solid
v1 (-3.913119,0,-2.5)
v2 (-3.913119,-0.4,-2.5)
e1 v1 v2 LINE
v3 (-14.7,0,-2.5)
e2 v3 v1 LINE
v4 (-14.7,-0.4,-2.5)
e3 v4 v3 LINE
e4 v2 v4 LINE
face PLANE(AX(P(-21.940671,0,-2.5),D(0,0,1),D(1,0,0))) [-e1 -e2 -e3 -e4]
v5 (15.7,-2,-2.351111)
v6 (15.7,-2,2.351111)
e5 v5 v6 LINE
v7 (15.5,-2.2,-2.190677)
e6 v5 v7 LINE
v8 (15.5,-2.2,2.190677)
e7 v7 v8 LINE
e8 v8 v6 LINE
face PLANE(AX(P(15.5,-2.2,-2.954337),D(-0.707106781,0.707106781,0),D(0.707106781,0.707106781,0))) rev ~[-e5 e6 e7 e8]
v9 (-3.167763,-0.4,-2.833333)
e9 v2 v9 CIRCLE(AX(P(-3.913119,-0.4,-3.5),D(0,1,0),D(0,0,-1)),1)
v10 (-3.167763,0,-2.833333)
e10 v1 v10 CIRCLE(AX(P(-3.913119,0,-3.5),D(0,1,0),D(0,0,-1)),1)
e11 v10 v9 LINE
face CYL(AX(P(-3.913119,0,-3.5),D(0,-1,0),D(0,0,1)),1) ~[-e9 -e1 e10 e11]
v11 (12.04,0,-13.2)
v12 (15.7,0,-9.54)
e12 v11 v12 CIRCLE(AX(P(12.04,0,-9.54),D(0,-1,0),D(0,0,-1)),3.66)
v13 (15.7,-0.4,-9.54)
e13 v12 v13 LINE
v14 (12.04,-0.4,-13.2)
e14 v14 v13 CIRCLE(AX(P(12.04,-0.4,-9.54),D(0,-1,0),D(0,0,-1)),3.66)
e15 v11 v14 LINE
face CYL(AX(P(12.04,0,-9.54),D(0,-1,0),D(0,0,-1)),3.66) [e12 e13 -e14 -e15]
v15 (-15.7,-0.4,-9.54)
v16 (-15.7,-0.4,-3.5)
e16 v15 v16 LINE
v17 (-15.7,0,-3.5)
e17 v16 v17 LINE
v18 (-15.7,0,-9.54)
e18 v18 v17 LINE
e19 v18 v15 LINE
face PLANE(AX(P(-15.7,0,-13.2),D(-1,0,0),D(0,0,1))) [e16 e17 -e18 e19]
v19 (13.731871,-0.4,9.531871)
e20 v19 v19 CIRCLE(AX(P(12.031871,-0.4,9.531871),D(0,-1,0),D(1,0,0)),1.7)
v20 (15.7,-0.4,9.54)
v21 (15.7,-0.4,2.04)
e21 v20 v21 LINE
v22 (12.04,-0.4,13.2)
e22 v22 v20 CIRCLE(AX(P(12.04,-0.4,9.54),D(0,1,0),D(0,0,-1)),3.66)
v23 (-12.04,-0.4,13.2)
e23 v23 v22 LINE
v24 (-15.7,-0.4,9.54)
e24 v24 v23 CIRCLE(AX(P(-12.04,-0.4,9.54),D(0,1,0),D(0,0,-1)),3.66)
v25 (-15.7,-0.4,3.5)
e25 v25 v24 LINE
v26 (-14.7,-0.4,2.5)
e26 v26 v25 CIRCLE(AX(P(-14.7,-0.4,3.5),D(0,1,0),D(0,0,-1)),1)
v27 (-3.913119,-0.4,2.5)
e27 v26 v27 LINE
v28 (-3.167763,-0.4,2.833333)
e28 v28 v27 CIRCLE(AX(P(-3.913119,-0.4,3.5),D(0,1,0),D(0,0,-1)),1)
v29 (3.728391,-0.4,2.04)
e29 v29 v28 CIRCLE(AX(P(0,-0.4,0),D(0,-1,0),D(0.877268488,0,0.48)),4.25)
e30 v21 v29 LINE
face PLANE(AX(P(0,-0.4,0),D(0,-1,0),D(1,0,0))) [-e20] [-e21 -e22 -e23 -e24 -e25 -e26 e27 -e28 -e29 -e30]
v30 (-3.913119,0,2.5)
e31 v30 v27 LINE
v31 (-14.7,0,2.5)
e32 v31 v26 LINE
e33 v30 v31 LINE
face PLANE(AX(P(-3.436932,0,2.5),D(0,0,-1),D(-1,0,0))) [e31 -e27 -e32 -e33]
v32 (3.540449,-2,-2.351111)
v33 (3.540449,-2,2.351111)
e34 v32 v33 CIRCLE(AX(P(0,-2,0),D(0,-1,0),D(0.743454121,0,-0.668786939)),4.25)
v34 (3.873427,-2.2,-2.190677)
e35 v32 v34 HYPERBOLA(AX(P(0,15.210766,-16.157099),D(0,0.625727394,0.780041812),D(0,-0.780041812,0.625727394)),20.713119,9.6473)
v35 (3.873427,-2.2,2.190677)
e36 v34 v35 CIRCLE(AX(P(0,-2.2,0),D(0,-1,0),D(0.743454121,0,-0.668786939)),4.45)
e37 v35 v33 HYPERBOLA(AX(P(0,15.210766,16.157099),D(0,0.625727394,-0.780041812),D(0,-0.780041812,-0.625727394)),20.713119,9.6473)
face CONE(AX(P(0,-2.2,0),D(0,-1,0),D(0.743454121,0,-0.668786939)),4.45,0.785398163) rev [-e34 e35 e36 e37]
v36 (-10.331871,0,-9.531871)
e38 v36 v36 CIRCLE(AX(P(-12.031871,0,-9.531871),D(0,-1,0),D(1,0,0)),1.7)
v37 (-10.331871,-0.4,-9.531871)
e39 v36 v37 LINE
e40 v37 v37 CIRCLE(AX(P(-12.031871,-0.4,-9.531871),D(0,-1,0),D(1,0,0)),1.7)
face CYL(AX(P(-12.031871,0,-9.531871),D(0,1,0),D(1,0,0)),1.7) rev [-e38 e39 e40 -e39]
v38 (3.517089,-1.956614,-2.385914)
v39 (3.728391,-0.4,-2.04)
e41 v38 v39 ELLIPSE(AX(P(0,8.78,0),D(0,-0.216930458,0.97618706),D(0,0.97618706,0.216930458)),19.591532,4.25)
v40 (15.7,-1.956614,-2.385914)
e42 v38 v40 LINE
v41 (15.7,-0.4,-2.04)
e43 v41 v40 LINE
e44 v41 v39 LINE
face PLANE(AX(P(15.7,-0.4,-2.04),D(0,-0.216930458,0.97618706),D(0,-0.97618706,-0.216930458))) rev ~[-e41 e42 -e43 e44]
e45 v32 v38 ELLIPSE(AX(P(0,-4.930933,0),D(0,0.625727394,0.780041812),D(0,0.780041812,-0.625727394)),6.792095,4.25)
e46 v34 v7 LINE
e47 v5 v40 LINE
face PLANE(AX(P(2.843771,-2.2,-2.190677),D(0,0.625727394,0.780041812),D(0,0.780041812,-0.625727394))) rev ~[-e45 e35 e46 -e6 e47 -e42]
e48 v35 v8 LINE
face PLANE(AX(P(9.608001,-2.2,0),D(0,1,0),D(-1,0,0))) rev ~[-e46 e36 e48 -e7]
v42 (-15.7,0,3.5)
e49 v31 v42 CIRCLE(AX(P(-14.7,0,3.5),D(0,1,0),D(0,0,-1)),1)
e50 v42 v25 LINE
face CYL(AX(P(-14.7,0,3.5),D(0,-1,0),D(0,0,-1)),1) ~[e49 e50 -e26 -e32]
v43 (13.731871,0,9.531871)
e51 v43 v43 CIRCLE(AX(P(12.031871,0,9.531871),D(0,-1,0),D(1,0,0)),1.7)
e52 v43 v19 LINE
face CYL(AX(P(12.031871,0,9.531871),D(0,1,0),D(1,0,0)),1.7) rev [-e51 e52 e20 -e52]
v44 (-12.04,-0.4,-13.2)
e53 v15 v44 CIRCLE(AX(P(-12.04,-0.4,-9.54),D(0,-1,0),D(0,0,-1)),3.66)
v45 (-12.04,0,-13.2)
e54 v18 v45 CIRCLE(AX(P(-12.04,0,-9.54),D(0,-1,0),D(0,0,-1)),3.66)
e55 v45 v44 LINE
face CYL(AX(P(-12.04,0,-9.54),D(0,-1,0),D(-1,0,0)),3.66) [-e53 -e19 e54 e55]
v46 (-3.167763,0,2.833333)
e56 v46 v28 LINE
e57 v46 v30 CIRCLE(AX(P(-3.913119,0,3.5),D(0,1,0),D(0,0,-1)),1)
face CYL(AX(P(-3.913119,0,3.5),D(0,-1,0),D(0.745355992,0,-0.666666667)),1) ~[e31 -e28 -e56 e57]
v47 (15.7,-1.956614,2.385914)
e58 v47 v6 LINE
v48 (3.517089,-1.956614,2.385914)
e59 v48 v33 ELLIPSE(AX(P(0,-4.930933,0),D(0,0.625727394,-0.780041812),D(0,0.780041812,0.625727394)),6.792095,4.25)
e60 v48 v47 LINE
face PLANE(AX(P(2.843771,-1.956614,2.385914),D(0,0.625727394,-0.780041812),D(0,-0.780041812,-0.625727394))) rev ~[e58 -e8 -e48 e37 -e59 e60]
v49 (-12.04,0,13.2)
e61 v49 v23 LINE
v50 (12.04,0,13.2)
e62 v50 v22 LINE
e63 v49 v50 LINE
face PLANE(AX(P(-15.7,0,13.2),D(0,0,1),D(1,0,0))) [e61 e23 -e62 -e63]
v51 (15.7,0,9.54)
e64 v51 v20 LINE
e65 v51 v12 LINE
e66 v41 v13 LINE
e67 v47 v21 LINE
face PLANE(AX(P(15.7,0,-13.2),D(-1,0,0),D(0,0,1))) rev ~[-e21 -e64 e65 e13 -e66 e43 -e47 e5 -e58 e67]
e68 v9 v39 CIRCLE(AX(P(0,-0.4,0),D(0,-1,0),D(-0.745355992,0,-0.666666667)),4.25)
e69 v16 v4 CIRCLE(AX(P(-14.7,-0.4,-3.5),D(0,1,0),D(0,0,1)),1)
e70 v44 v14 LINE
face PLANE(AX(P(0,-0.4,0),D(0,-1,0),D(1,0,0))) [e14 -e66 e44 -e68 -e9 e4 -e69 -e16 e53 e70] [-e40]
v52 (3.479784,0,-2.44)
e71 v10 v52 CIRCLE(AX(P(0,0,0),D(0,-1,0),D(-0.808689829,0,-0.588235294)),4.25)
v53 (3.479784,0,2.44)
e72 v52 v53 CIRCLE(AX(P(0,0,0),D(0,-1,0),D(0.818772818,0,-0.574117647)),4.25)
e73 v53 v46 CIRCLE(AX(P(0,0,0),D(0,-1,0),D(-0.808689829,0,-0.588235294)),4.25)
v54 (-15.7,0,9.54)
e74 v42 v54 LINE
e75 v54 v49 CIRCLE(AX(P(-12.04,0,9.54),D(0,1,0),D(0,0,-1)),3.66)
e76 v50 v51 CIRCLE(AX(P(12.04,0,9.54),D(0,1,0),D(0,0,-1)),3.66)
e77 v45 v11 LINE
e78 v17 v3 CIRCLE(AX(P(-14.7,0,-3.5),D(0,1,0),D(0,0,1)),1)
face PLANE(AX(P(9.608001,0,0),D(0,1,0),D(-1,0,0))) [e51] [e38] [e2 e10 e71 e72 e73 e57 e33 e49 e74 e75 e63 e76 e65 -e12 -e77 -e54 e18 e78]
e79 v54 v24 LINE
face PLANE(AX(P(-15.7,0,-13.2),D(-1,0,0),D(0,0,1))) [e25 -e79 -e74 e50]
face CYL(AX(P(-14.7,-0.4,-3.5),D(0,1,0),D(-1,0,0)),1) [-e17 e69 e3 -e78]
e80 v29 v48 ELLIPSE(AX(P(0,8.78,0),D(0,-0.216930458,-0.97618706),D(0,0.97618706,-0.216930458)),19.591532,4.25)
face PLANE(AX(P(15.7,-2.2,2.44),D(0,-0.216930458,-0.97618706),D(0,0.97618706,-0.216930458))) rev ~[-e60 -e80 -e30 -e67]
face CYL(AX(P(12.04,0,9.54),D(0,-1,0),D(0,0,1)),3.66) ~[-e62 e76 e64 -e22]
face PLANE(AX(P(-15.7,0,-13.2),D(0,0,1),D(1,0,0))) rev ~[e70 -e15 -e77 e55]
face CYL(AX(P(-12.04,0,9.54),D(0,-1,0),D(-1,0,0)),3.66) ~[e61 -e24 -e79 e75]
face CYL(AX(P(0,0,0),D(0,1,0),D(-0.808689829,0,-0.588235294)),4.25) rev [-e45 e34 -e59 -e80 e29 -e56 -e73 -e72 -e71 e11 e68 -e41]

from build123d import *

# Parameters (mm, degrees)
F0_W         = 31.4
F0_H         = 26.4
F0_R         = 1.7
F1_DEPTH     = 0.4
F2_R         = 3.66
F4_DEPTH     = 25
F5_R         = 1
F7_DEPTH     = 2.2
F9_DEPTH     = 25
F10_T1_DEPTH = 13.4922434022
F10_T3_DEPTH = 5.9086731952
F10_T6_ANGLE = 83.9470182362


# Not quite as in the source:
# - a fillet or chamfer that OpenCascade refuses, or shapes differently, is made with other operations: its cross-section is extruded or revolved along the edge and cut away or added


with BuildPart() as f1:
    # F0 (on Front) → F1 (new body)
    with BuildSketch(Plane.XZ):
        Rectangle(F0_W, F0_H)
        with Locations((-12.0318713589, -9.5318713589)):
            Circle(F0_R, mode=Mode.SUBTRACT)
        with Locations((12.0318713589, 9.5318713589)):
            Circle(F0_R, mode=Mode.SUBTRACT)
    extrude(amount=F1_DEPTH)

    # F2
    f2_edges = [f1.edges().sort_by_distance(p)[0] for p in [
        (15.7, -0.2, -13.2),
        (15.7, -0.2, 13.2),
        (-15.7, -0.2, -13.2),
        (-15.7, -0.2, 13.2),
    ]]
    fillet(f2_edges, radius=F2_R)

    # F3 (on Front) → F4 (cut)
    with BuildSketch(Plane.XZ):
        with BuildLine():
            Line((-21.9406711915, -2.5), (-3.4369317712, -2.5))
            ThreePointArc((-3.4369317712, -2.5), (4.25, 0), (-3.4369317712, 2.5))
            Line((-3.4369317712, 2.5), (-21.9406711915, 2.5))
            Line((-21.9406711915, 2.5), (-21.9406711915, -2.5))
        make_face()
    extrude(amount=F4_DEPTH, mode=Mode.SUBTRACT)

    # F5
    f5_edges = [f1.edges().sort_by_distance(p)[0] for p in [
        (-3.436932, -0.2, -2.5),
        (-3.436932, -0.2, 2.5),
        (-15.7, -0.2, 2.5),
        (-15.7, -0.2, -2.5),
    ]]
    fillet(f5_edges, radius=F5_R)

    # F6 (on face) → F7 (join)
    with BuildSketch(Plane(origin=(0, 0, 0), x_dir=(-1, 0, 0), z_dir=(0, 1, 0))):
        with BuildLine():
            Line((-3.4797844761, 2.44), (-15.7, 2.44))
            Line((-15.7, 2.44), (-15.7, -2.44))
            Line((-15.7, -2.44), (-3.4797844761, -2.44))
            ThreePointArc((-3.4797844761, -2.44), (-4.25, 0), (-3.4797844761, 2.44))
        make_face()
    extrude(amount=-F7_DEPTH)

    # F8 (on face) → F9 (cut)
    with BuildSketch(Plane.YZ.offset(15.7)):
        Polygon((-0.4, 2.44), (-2.2, 2.44), (-0.4, 2.04), align=None)
        Polygon((-0.4, -2.04), (-2.2, -2.44), (-0.4, -2.44), align=None)
    extrude(amount=-F9_DEPTH, mode=Mode.SUBTRACT)

    # F10: chamfer of 0.2 on 4 edges, made by hand

    # F10_s2 → F10_t1 (cut)
    with BuildSketch(Plane.YZ.offset(2.8437705369)):
        Polygon((-1.9566139084, 2.3859142019), (-2.2, 2.1906767898), (-2.2, 2.44), align=None)
        Polygon((-2.2, -2.1906767898), (-1.9566139084, -2.3859142019), (-2.2, -2.44), align=None)
    extrude(amount=F10_T1_DEPTH, mode=Mode.SUBTRACT)

    # F10_s4 → F10_t3 (cut)
    with BuildSketch(Plane.XY.offset(-2.9543365976)):
        Polygon((15.5, -2.2), (15.7, -2), (15.7, -2.2), align=None)
    extrude(amount=F10_T3_DEPTH, mode=Mode.SUBTRACT)

    # F10_s5 → F10_t6 (revolve, cut)
    with BuildSketch(Plane(origin=(0, 0, 0), x_dir=(0, 1, 0), z_dir=(-0.6687869395, 0, -0.7434541207))):
        Polygon((-2.2, 4.45), (-2, 4.25), (-2.2, 4.25), align=None)
    revolve(axis=Axis((0, -2.2, 0), (0, -1, 0)), revolution_arc=F10_T6_ANGLE, mode=Mode.SUBTRACT)


solid = f1.part
